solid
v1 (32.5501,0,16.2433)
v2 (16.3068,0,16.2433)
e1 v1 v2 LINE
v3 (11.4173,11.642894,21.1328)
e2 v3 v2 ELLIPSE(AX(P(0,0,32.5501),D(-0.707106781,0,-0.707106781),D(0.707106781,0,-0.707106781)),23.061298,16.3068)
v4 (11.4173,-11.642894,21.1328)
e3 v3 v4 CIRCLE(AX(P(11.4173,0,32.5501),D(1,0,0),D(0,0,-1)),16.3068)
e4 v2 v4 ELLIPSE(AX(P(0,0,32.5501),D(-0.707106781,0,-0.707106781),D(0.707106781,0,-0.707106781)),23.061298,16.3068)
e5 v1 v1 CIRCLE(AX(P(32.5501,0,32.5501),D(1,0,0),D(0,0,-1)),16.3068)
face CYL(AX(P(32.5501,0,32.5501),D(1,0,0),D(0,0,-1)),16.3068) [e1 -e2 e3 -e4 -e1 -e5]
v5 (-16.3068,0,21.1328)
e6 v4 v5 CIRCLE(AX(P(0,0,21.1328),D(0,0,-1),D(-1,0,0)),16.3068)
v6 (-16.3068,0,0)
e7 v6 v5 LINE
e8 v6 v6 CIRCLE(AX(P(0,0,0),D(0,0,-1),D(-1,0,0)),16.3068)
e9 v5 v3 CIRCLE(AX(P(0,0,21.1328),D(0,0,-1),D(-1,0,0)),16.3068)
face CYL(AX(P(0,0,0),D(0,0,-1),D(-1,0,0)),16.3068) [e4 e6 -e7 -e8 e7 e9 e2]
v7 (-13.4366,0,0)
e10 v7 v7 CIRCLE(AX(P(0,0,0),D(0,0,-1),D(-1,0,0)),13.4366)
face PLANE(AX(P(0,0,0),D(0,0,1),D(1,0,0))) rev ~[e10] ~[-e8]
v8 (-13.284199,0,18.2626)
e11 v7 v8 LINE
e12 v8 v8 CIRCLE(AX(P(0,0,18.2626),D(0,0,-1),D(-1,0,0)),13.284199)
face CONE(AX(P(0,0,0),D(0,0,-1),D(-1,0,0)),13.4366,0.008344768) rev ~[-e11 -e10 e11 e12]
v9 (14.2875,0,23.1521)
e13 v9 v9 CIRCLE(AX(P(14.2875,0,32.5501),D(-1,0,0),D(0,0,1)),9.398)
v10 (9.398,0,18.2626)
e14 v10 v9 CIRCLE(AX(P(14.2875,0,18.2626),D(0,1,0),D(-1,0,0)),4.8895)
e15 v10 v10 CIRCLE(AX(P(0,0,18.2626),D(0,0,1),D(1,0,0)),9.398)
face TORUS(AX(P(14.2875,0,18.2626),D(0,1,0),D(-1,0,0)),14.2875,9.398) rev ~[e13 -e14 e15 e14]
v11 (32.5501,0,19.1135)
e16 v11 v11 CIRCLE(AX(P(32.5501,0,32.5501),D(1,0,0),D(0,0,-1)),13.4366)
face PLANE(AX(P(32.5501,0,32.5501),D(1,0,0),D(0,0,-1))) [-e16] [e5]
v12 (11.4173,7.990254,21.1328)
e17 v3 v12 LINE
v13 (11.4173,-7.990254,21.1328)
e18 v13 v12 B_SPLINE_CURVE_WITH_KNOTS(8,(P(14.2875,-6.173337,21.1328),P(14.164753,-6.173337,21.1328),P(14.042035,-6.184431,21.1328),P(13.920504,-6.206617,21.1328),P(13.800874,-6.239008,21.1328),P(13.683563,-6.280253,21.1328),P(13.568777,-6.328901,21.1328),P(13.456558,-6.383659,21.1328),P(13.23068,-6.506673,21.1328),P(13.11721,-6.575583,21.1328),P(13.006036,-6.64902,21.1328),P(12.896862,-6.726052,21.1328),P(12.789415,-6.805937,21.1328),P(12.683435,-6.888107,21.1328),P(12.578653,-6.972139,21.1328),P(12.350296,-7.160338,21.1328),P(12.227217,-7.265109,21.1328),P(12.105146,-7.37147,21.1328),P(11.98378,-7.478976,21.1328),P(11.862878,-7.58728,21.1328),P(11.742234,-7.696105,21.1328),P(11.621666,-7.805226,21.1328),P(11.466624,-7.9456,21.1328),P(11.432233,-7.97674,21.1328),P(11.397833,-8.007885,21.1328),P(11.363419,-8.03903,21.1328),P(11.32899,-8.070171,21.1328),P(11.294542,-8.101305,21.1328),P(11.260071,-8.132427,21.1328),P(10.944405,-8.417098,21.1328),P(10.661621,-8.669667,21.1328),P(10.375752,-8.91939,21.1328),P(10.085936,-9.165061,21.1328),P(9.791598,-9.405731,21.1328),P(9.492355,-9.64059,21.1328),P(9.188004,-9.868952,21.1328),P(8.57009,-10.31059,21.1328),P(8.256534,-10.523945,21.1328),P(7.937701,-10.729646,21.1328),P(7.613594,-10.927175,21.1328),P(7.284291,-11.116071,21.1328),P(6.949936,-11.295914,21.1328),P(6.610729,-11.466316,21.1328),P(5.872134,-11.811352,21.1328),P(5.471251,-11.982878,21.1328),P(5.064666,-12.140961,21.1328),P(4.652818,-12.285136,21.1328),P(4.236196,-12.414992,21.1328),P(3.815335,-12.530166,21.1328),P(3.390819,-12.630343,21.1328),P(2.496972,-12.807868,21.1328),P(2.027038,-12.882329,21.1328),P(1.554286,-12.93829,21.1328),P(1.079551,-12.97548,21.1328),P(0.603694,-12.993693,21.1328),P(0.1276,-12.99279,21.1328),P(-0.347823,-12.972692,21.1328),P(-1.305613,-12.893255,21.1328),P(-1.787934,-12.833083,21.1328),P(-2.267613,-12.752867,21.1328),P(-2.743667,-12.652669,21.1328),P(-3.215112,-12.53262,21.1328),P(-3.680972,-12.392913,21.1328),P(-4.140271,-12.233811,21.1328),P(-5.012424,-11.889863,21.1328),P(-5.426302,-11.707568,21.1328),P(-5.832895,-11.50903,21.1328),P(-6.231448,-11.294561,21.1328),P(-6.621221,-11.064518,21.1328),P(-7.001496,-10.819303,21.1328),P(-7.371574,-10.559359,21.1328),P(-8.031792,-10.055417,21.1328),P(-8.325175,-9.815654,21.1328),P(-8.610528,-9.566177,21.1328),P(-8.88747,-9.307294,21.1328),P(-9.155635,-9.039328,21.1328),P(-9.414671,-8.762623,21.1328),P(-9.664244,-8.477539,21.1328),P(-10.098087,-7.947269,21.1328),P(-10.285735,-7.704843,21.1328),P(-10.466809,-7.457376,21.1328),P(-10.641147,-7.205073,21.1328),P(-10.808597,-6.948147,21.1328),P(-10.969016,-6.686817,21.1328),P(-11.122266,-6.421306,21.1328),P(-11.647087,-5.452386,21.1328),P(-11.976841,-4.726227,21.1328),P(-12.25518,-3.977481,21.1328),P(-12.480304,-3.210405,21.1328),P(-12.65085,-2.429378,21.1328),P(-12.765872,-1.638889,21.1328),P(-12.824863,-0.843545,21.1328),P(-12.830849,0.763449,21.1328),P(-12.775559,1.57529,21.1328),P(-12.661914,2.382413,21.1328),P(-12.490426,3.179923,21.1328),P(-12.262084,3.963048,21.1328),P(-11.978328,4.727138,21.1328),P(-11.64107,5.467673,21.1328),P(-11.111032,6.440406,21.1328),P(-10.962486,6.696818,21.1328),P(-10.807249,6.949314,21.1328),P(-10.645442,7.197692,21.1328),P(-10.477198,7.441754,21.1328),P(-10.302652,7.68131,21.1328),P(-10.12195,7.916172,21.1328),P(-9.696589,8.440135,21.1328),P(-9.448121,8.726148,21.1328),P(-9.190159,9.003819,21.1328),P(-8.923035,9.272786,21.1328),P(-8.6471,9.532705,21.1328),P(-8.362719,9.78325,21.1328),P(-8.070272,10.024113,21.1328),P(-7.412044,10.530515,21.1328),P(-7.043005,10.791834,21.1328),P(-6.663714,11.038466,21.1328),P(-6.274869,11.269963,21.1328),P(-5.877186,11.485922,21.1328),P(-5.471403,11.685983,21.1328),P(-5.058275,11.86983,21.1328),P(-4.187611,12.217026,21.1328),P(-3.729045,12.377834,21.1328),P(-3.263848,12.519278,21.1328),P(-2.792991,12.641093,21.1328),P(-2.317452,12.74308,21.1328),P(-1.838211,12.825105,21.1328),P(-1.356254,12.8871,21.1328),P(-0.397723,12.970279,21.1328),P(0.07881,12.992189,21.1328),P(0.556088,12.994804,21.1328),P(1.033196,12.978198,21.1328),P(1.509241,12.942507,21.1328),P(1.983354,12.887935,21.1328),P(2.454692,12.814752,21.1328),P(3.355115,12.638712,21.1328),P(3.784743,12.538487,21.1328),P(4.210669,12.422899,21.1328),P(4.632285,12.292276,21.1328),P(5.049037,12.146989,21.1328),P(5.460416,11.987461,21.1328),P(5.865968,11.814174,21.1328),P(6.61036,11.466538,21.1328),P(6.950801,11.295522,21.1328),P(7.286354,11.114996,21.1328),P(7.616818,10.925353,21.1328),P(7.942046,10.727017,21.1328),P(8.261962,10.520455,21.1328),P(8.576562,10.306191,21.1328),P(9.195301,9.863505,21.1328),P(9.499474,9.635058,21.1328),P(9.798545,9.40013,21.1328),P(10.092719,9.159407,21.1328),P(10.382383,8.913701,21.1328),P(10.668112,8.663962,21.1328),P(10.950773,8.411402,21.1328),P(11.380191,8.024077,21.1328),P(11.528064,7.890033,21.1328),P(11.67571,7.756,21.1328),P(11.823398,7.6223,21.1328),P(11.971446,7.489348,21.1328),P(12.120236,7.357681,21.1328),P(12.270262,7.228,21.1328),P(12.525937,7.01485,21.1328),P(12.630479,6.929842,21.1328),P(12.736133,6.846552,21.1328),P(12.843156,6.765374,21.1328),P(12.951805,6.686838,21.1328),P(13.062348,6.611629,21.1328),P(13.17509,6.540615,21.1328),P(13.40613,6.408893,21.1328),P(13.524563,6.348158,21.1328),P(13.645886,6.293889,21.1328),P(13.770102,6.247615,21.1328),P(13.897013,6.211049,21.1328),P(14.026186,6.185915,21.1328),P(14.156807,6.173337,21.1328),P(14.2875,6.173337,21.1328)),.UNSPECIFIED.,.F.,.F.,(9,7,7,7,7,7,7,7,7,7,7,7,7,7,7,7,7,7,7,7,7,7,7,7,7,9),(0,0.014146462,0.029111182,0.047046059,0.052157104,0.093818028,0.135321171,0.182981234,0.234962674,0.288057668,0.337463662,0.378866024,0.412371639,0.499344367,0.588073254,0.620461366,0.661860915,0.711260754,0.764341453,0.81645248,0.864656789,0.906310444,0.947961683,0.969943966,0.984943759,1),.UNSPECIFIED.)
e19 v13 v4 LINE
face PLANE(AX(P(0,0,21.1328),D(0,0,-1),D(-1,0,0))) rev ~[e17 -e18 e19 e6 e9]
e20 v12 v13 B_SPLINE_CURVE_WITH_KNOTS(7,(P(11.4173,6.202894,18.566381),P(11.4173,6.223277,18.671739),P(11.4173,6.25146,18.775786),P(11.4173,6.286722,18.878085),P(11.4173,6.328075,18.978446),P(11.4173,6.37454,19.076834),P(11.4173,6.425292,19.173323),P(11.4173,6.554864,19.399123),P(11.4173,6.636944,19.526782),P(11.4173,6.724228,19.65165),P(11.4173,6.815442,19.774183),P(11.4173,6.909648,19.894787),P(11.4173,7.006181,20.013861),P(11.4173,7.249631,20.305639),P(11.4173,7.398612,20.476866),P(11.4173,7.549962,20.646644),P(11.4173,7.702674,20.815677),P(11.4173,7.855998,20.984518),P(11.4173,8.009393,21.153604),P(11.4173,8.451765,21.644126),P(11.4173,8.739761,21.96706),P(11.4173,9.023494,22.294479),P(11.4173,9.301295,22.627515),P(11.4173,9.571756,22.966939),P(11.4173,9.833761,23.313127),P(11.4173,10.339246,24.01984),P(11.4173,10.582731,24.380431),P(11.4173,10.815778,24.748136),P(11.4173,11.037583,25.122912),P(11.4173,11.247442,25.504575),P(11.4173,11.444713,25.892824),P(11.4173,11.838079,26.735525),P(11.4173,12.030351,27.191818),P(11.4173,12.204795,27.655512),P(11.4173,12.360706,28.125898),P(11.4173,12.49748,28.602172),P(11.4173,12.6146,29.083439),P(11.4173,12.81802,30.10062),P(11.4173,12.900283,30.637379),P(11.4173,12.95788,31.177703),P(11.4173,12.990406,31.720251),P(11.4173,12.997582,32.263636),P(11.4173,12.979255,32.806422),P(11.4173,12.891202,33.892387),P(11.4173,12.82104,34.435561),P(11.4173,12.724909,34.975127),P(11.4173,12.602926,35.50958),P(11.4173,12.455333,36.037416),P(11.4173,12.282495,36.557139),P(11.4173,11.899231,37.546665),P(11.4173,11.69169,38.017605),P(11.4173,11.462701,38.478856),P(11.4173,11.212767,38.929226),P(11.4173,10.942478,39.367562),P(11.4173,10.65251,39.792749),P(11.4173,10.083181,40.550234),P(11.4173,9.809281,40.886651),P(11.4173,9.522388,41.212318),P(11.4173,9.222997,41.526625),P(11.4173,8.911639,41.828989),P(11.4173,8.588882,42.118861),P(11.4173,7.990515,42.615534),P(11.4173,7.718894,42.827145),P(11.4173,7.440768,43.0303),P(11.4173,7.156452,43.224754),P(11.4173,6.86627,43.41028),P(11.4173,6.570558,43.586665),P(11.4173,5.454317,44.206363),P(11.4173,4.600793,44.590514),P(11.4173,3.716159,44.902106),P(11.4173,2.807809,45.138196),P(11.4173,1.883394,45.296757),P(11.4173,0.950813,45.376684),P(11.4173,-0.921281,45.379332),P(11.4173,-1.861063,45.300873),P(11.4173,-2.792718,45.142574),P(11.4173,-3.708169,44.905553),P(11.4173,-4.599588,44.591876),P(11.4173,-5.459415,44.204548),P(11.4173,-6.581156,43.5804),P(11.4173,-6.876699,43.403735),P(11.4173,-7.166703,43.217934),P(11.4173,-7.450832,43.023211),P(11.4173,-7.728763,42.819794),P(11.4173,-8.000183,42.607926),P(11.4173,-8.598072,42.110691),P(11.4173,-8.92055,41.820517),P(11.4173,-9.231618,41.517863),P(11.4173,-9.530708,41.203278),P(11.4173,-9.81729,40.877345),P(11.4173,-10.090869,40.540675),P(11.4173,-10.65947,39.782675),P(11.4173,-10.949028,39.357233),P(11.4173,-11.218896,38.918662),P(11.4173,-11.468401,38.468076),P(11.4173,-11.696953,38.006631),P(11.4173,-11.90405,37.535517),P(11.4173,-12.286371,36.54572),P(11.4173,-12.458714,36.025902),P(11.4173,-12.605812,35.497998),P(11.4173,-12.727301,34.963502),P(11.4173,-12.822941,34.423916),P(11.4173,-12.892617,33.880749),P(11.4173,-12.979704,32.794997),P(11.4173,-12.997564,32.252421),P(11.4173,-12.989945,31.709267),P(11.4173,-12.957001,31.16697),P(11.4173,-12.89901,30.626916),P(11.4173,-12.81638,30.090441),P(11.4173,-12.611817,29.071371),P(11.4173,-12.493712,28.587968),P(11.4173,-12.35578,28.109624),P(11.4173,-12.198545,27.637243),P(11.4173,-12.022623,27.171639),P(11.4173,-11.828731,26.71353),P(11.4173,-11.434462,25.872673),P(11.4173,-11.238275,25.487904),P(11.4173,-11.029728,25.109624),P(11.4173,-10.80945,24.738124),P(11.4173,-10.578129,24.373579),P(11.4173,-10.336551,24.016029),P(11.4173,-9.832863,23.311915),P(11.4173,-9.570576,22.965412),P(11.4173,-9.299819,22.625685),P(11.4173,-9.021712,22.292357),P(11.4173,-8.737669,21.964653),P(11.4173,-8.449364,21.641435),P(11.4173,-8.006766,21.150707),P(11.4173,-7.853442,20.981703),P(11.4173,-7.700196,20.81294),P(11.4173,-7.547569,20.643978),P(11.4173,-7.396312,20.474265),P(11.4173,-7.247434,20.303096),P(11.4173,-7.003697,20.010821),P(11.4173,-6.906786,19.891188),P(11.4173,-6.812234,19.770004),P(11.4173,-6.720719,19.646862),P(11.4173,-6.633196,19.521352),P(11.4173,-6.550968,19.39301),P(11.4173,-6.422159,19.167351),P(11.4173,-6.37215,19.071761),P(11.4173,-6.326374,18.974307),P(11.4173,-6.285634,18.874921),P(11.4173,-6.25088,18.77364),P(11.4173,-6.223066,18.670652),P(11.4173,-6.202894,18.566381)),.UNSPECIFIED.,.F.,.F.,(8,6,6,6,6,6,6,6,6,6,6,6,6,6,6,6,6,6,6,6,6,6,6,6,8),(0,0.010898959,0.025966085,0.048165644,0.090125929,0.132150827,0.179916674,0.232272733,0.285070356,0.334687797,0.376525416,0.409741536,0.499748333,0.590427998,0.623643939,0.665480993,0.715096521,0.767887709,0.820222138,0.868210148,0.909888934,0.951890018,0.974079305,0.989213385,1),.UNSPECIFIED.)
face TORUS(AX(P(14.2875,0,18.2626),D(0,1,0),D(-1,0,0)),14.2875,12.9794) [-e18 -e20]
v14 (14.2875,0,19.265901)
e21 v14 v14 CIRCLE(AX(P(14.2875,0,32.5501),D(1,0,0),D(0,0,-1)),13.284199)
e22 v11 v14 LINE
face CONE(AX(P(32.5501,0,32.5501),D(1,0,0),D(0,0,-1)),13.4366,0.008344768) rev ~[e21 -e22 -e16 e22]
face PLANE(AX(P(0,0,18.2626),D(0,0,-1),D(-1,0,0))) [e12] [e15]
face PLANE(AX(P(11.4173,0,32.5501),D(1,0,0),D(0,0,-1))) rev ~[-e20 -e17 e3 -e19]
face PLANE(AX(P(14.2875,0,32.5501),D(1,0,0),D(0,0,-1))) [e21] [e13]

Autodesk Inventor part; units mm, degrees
ref_plane "YZ Plane" through (0, 0, 0) normal (1, 0, 0) x (0, 1, 0)
ref_plane "XZ Plane" through (0, 0, 0) normal (0, 1, 0) x (-1, 0, 0)
ref_plane "XY Plane" through (0, 0, 0) normal (0, 0, 1) x (1, 0, 0)
sketch "Sketch1" plane through (0, 0, 0) normal (0, 1, 0) x (-1, 0, 0)
  line L0 (0, 0) -> (0, 18.2626)
  arc A0 (0, 18.2626) -> (-14.2875, 32.5501) centre (-14.2875, 18.2626) ccw
  line L1 (-14.2875, 32.5501) -> (-32.5501, 32.5501)
  line L2 (-14.2875, 32.5501) -> (0, 32.5501) construction
  line L3 (0, 32.5501) -> (0, 18.2626) construction
  dimension "d0" = 32.5501
  dimension "d1" = 32.5501
  dimension "d2" = 18.2626
sketch "Sketch2" plane through (0, 0, 0) normal (0, 0, 1) x (1, 0, 0)
  circle A0 centre (0, 0) radius 12.9794
  circle A1 centre (0, 0) radius 9.398
  dimension "d3" = 18.796
  dimension "d4" = 25.9588
sweep "Sweep1" add profiles "Sketch2" path "Sketch1"
sketch "Sketch3" plane through (0, 0, 0) normal (0, 0, -1) x (-1, 0, 0)
  circle A0 centre (0, 0) radius 16.3068
  circle A1 centre (0, 0) radius 12.9794 projected
  circle A2 centre (0, 0) radius 11.1887
  dimension "d6" = 32.6136
  dimension "d9" = 22.3774
extrude "Extrusion1" add sketch "Sketch3" against normal blind 21.1328 contours A0 | A1
sketch "Sketch4" plane through (32.5501, 0, 32.5501) normal (1, 0, 0) x (0, 0, -1)
  circle A0 centre (0, 0) radius 9.398 projected
  circle A1 centre (0, 0) radius 11.1887
  circle A2 centre (0, 0) radius 16.3068
  dimension "d10" = 32.6136
  dimension "d11" = 22.3774
extrude "Extrusion2" add sketch "Sketch4" against normal blind 21.1328 contours A2
sketch "Sketch5" plane through (0, 0, 0) normal (0, 0, -1) x (-1, 0, 0)
  circle A0 centre (0, 0) radius 9.398 projected
  circle A1 centre (0, 0) radius 13.4366
  dimension "d14" = 26.8732
sketch "Sketch5 outline for Extrusion3" plane through (0, 0, 0) normal (0, 0, -1) x (-1, 0, 0)
  circle A0 centre (0, 0) radius 13.4366
extrude "Extrusion3" cut sketch "Sketch5 outline for Extrusion3" against normal blind 18.2626 draft -0.47812
sketch "Sketch6" plane through (32.5501, 0, 32.5501) normal (1, 0, 0) x (0, 0, -1)
  circle A0 centre (0, 0) radius 9.398 projected
  circle A1 centre (0, 0) radius 13.4366
  dimension "d17" = 26.8732
sketch "Sketch6 outline for Extrusion4" plane through (32.5501, 0, 32.5501) normal (1, 0, 0) x (0, 0, -1)
  circle A0 centre (0, 0) radius 13.4366
extrude "Extrusion4" cut sketch "Sketch6 outline for Extrusion4" against normal blind 18.2626 draft -0.47812
equation "\"d0\" = G + C1"
equation "\"d1\" = G + C1"
equation "\"d2\" = C1"
equation "\"d3\" = D"
equation "\"d4\" = D + 2 * F1"
equation "\"d6\" = A + 2 * E1"
equation "\"d9\" = D + F1"
equation "\"d7\" = C1 + E1"
equation "\"d10\" = A + 2 * E1"
equation "\"d11\" = D + F1"
equation "\"d12\" = C1 + E1"
equation "\"d14\" = A"
equation "\"d15\" = C1"
equation "\"d17\" = A"
equation "\"d18\" = C1"
equation "\"A\" = 26.8732"
equation "\"C1\" = 18.2626"
equation "\"F1\" = 3.5814"
equation "\"D\" = 18.796"
equation "\"G\" = 14.2875"
equation "\"E1\" = 2.8702"
equation "\"B\" = 26.5684"
equation "\"Size_Designation\" = 0.75"
properties part number "ASTM D 2466 90 Deg Elbow Socket-Type - Schedule 40 3/4" material "PVC-Piping"
